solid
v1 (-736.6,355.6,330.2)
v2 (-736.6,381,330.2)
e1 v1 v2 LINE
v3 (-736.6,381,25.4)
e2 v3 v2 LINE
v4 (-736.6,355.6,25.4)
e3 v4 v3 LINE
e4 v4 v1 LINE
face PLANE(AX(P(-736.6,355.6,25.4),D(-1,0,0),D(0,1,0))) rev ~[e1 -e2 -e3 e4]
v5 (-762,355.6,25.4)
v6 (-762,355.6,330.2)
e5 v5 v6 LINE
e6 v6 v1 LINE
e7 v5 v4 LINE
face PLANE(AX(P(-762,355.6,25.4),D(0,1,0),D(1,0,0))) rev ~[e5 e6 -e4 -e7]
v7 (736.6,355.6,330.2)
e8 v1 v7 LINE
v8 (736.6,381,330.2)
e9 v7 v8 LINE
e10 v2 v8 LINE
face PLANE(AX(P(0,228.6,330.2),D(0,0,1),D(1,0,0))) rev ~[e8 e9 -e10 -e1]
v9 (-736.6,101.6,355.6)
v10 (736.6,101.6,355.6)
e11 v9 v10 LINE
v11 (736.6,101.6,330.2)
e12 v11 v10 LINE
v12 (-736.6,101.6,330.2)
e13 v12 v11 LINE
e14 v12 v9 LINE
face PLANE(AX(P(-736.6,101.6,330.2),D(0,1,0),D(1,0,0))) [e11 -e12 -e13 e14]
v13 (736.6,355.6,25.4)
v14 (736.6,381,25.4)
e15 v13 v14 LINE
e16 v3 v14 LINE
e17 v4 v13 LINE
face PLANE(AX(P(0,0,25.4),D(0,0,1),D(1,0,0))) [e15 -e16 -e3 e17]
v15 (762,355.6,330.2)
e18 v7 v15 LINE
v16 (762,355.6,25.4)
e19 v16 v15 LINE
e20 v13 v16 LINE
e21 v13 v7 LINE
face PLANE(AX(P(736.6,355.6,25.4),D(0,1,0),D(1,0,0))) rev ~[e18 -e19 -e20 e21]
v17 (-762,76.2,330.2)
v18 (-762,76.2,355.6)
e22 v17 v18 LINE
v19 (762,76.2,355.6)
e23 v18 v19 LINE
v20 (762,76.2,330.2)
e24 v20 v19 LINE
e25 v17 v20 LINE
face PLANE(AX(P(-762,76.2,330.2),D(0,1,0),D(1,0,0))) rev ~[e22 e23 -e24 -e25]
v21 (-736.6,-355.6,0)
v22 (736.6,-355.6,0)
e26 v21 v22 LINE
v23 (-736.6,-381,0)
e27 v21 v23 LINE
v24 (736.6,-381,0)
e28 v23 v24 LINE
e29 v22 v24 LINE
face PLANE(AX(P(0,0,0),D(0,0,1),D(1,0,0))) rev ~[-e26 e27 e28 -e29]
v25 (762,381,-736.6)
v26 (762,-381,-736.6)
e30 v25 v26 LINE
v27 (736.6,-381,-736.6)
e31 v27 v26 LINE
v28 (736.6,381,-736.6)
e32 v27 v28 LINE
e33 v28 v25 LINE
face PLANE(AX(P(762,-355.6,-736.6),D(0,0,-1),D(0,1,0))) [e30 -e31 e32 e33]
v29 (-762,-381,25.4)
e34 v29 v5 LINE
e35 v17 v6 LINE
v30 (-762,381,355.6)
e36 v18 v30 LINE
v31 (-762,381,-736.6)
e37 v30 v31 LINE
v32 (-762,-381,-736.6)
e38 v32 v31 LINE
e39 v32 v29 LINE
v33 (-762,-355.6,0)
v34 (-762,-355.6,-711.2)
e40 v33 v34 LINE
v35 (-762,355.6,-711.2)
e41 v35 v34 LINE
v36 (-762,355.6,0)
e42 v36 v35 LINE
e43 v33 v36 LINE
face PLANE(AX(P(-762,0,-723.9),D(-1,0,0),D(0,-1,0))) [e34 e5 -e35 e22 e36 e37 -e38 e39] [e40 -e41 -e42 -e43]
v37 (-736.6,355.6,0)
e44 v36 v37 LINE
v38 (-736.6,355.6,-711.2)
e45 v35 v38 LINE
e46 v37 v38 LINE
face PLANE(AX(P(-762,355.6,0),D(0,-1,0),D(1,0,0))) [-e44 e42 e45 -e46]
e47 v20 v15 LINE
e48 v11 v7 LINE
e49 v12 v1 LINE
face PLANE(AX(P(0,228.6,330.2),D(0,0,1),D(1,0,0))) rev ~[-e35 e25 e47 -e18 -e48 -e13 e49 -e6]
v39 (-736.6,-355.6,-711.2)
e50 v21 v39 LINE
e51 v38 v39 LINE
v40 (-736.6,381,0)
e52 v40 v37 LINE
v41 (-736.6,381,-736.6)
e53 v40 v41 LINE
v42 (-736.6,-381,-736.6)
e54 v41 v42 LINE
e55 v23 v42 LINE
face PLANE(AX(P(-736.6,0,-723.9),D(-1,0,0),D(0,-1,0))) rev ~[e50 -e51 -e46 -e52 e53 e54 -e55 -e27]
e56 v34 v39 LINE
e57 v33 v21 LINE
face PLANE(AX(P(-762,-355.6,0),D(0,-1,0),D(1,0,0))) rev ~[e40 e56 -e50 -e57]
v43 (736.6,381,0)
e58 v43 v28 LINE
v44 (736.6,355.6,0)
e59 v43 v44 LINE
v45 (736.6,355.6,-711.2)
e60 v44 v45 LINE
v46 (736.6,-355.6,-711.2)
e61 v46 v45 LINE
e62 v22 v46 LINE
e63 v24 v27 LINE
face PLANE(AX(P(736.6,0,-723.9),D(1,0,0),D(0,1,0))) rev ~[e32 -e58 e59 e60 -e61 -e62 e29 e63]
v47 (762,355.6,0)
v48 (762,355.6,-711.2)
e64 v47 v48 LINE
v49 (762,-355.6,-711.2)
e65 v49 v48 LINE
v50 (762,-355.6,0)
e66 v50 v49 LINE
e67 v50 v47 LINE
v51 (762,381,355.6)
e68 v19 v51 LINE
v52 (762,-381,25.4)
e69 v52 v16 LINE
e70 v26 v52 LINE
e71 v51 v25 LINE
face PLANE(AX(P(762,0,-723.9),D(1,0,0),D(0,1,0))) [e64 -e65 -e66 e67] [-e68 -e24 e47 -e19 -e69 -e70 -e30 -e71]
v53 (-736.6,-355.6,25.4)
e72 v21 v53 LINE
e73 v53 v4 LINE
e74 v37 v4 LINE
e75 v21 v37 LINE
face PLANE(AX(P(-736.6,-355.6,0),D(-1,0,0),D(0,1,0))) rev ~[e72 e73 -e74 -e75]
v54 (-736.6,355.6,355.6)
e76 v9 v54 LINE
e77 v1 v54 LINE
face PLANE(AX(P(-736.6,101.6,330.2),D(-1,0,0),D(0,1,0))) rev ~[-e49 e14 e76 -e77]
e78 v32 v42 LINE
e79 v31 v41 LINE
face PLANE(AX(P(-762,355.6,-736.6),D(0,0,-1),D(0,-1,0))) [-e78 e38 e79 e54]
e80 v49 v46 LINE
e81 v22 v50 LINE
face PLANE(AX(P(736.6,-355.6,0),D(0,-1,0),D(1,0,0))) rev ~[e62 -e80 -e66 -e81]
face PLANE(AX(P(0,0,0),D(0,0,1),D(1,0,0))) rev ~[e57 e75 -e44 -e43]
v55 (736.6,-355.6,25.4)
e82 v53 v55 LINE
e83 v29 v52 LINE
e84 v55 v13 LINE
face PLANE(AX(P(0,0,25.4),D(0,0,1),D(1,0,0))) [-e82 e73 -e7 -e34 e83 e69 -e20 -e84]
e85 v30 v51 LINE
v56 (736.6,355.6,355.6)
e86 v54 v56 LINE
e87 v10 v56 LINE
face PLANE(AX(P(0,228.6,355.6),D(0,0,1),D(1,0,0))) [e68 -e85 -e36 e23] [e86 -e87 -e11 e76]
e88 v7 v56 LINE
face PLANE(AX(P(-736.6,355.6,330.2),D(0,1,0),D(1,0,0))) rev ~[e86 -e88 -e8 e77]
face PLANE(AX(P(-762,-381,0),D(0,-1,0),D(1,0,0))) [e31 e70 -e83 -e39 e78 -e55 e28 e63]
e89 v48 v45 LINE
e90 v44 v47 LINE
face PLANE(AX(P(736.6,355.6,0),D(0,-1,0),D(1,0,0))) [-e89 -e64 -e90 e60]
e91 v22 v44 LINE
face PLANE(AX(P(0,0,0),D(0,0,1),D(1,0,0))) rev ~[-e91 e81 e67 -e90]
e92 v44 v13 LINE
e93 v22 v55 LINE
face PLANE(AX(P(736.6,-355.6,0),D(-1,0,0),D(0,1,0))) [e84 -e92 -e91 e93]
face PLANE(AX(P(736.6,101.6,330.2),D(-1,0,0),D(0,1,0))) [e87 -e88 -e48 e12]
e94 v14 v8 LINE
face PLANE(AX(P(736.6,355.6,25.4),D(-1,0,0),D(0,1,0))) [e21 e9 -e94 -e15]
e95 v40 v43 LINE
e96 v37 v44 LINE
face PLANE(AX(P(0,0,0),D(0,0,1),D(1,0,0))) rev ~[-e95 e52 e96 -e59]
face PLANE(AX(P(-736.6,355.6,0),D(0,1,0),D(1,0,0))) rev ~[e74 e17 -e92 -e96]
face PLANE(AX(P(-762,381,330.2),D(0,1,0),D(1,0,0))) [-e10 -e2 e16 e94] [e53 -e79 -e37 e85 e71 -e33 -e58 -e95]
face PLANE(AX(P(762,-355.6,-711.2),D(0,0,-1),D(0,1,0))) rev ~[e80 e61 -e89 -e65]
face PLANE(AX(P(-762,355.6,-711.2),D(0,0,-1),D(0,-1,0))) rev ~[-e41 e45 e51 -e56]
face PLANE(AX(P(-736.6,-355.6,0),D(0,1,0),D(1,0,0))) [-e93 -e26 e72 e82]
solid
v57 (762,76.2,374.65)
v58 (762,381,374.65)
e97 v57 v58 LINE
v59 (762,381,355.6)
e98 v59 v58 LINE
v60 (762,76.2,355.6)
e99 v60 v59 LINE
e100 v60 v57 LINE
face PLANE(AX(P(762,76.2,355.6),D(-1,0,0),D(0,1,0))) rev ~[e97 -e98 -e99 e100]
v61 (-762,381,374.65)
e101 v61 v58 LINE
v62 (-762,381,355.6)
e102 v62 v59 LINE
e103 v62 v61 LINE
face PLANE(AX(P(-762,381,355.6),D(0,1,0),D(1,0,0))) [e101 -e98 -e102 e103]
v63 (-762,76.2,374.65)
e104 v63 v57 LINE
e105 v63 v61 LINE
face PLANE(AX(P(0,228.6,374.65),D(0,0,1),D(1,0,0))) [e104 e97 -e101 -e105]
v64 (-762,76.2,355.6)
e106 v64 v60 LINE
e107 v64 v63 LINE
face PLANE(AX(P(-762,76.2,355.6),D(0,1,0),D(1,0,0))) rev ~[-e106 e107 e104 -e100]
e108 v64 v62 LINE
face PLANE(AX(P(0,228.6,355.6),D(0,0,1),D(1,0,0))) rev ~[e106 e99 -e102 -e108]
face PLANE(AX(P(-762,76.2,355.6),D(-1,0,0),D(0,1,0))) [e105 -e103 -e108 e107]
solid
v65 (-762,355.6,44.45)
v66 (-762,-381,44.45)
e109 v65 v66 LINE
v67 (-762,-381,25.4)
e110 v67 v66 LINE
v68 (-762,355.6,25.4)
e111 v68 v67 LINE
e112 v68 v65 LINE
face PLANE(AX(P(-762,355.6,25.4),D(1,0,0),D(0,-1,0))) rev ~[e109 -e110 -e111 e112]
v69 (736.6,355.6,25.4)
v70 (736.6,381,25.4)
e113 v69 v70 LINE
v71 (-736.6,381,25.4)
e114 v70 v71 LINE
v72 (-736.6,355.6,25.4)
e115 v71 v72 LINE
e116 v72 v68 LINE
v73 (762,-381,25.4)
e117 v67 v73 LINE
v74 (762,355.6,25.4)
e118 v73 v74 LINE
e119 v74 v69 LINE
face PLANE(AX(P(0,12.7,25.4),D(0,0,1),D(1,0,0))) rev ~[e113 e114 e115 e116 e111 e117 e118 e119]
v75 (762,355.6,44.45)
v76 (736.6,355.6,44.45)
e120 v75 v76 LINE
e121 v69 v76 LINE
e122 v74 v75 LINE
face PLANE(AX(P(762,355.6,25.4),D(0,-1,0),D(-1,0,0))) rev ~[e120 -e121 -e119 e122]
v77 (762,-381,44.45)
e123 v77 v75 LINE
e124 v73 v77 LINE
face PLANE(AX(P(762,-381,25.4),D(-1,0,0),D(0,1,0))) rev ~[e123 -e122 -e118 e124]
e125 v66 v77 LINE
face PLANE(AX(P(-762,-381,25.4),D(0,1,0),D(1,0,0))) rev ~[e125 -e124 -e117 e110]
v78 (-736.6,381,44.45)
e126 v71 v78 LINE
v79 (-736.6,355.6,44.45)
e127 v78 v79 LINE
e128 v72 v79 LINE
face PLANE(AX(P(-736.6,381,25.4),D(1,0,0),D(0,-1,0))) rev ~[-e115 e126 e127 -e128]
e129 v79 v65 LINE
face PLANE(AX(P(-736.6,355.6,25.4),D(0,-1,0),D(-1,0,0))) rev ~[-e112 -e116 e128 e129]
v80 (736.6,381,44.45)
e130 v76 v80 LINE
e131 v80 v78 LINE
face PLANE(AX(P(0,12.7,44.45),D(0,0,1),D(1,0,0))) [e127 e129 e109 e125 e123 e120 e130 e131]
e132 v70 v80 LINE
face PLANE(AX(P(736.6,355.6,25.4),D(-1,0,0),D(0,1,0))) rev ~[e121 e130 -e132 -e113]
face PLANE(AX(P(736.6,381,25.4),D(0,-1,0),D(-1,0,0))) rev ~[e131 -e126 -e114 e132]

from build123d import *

# Parameters (mm, degrees)
F0_W      = 1524
F0_H      = 762
F0_W_2    = 1473.2
F0_H_2    = 711.2
F1_DEPTH  = 25.4
F2_W      = 25.4
F2_H      = 25.4
F3_DEPTH  = 736.6
F4_W      = 25.4
F4_H      = 25.4
F5_DEPTH  = 304.8
F6_W      = 1524
F6_H      = 304.8
F6_W_2    = 1473.2
F6_H_2    = 254
F7_DEPTH  = 25.4
F8_W      = 711.2
F8_H      = 25.4
F9_DEPTH  = 25.4
F10_W     = 711.2
F10_H     = 25.4
F11_DEPTH = 25.4
F13_DEPTH = 19.05
F14_W     = 1524
F14_H     = 304.8
F14_W_2   = 1473.2
F14_H_2   = 254
F15_DEPTH = 19.05


# Not quite as in the source:
# - a length typed as a fraction of an inch, garbled in the dataset ("3 / 203.2 mm" for 3/8 in), is restored
# - a feature names something its author has since deleted; it is built from what else it names


with BuildPart() as f1:
    # F0 (on Top) → F1 (new body)
    with BuildSketch(Plane.XY):
        Rectangle(F0_W, F0_H)
        Rectangle(F0_W_2, F0_H_2, mode=Mode.SUBTRACT)
    extrude(amount=F1_DEPTH)

    # F2 (on face) → F3 (join)
    with BuildSketch(Plane(origin=(0, 0, 0), x_dir=(1, 0, 0), z_dir=(0, 0, -1))):
        with Locations((-749.3, 368.3)):
            Rectangle(F2_W, F2_H)
        with Locations((-749.3, -368.3)):
            Rectangle(F2_W, F2_H)
        with Locations((749.3, -368.3)):
            Rectangle(F2_W, F2_H)
        with Locations((749.3, 368.3)):
            Rectangle(F2_W, F2_H)
    extrude(amount=F3_DEPTH)

    # F4 (on face) → F5 (join)
    with BuildSketch(Plane.XY.offset(25.4)):
        with Locations((749.3, 368.3)):
            Rectangle(F4_W, F4_H)
        with Locations((-749.3, 368.3)):
            Rectangle(F4_W, F4_H)
    extrude(amount=F5_DEPTH)

    # F6 (on face) → F7 (join)
    with BuildSketch(Plane.XY.offset(330.2)):
        with Locations((0, 228.6)):
            Rectangle(F6_W, F6_H)
        with Locations((0, 228.6)):
            Rectangle(F6_W_2, F6_H_2, mode=Mode.SUBTRACT)
    extrude(amount=F7_DEPTH)

    # F8 (on face) → F9 (join)
    with BuildSketch(Plane.YZ.offset(762)):
        with Locations((0, -723.9)):
            Rectangle(F8_W, F8_H)
    extrude(amount=-F9_DEPTH)

    # F10 (on face) → F11 (join)
    with BuildSketch(Plane(origin=(-762, 0, 0), x_dir=(0, -1, 0), z_dir=(-1, 0, 0))):
        with Locations((0, -723.9)):
            Rectangle(F10_W, F10_H)
    extrude(amount=-F11_DEPTH)


with BuildPart() as f13:
    # F12 (on face) → F13 (new body)
    with BuildSketch(Plane.XY.offset(25.4)):
        Polygon((-736.6, 381), (-736.6, 355.6), (-736.6, -355.6), (736.6, -355.6), (736.6, 355.6), (736.6, 381), align=None)
        Polygon((-762, 355.6), (-762, -381), (762, -381), (762, 355.6), (736.6, 355.6), (736.6, -355.6), (-736.6, -355.6), (-736.6, 355.6), align=None)
    extrude(amount=F13_DEPTH)


with BuildPart() as f15:
    # F14 (on face) → F15 (new body)
    with BuildSketch(Plane.XY.offset(355.6)):
        with Locations((0, 228.6)):
            Rectangle(F14_W, F14_H)
        with Locations((0, 228.6)):
            Rectangle(F14_W_2, F14_H_2, mode=Mode.SUBTRACT)
        with Locations((0, 228.6)):
            Rectangle(F14_W_2, F14_H_2)
    extrude(amount=F15_DEPTH)


solid = Compound([f1.part, f13.part, f15.part])
